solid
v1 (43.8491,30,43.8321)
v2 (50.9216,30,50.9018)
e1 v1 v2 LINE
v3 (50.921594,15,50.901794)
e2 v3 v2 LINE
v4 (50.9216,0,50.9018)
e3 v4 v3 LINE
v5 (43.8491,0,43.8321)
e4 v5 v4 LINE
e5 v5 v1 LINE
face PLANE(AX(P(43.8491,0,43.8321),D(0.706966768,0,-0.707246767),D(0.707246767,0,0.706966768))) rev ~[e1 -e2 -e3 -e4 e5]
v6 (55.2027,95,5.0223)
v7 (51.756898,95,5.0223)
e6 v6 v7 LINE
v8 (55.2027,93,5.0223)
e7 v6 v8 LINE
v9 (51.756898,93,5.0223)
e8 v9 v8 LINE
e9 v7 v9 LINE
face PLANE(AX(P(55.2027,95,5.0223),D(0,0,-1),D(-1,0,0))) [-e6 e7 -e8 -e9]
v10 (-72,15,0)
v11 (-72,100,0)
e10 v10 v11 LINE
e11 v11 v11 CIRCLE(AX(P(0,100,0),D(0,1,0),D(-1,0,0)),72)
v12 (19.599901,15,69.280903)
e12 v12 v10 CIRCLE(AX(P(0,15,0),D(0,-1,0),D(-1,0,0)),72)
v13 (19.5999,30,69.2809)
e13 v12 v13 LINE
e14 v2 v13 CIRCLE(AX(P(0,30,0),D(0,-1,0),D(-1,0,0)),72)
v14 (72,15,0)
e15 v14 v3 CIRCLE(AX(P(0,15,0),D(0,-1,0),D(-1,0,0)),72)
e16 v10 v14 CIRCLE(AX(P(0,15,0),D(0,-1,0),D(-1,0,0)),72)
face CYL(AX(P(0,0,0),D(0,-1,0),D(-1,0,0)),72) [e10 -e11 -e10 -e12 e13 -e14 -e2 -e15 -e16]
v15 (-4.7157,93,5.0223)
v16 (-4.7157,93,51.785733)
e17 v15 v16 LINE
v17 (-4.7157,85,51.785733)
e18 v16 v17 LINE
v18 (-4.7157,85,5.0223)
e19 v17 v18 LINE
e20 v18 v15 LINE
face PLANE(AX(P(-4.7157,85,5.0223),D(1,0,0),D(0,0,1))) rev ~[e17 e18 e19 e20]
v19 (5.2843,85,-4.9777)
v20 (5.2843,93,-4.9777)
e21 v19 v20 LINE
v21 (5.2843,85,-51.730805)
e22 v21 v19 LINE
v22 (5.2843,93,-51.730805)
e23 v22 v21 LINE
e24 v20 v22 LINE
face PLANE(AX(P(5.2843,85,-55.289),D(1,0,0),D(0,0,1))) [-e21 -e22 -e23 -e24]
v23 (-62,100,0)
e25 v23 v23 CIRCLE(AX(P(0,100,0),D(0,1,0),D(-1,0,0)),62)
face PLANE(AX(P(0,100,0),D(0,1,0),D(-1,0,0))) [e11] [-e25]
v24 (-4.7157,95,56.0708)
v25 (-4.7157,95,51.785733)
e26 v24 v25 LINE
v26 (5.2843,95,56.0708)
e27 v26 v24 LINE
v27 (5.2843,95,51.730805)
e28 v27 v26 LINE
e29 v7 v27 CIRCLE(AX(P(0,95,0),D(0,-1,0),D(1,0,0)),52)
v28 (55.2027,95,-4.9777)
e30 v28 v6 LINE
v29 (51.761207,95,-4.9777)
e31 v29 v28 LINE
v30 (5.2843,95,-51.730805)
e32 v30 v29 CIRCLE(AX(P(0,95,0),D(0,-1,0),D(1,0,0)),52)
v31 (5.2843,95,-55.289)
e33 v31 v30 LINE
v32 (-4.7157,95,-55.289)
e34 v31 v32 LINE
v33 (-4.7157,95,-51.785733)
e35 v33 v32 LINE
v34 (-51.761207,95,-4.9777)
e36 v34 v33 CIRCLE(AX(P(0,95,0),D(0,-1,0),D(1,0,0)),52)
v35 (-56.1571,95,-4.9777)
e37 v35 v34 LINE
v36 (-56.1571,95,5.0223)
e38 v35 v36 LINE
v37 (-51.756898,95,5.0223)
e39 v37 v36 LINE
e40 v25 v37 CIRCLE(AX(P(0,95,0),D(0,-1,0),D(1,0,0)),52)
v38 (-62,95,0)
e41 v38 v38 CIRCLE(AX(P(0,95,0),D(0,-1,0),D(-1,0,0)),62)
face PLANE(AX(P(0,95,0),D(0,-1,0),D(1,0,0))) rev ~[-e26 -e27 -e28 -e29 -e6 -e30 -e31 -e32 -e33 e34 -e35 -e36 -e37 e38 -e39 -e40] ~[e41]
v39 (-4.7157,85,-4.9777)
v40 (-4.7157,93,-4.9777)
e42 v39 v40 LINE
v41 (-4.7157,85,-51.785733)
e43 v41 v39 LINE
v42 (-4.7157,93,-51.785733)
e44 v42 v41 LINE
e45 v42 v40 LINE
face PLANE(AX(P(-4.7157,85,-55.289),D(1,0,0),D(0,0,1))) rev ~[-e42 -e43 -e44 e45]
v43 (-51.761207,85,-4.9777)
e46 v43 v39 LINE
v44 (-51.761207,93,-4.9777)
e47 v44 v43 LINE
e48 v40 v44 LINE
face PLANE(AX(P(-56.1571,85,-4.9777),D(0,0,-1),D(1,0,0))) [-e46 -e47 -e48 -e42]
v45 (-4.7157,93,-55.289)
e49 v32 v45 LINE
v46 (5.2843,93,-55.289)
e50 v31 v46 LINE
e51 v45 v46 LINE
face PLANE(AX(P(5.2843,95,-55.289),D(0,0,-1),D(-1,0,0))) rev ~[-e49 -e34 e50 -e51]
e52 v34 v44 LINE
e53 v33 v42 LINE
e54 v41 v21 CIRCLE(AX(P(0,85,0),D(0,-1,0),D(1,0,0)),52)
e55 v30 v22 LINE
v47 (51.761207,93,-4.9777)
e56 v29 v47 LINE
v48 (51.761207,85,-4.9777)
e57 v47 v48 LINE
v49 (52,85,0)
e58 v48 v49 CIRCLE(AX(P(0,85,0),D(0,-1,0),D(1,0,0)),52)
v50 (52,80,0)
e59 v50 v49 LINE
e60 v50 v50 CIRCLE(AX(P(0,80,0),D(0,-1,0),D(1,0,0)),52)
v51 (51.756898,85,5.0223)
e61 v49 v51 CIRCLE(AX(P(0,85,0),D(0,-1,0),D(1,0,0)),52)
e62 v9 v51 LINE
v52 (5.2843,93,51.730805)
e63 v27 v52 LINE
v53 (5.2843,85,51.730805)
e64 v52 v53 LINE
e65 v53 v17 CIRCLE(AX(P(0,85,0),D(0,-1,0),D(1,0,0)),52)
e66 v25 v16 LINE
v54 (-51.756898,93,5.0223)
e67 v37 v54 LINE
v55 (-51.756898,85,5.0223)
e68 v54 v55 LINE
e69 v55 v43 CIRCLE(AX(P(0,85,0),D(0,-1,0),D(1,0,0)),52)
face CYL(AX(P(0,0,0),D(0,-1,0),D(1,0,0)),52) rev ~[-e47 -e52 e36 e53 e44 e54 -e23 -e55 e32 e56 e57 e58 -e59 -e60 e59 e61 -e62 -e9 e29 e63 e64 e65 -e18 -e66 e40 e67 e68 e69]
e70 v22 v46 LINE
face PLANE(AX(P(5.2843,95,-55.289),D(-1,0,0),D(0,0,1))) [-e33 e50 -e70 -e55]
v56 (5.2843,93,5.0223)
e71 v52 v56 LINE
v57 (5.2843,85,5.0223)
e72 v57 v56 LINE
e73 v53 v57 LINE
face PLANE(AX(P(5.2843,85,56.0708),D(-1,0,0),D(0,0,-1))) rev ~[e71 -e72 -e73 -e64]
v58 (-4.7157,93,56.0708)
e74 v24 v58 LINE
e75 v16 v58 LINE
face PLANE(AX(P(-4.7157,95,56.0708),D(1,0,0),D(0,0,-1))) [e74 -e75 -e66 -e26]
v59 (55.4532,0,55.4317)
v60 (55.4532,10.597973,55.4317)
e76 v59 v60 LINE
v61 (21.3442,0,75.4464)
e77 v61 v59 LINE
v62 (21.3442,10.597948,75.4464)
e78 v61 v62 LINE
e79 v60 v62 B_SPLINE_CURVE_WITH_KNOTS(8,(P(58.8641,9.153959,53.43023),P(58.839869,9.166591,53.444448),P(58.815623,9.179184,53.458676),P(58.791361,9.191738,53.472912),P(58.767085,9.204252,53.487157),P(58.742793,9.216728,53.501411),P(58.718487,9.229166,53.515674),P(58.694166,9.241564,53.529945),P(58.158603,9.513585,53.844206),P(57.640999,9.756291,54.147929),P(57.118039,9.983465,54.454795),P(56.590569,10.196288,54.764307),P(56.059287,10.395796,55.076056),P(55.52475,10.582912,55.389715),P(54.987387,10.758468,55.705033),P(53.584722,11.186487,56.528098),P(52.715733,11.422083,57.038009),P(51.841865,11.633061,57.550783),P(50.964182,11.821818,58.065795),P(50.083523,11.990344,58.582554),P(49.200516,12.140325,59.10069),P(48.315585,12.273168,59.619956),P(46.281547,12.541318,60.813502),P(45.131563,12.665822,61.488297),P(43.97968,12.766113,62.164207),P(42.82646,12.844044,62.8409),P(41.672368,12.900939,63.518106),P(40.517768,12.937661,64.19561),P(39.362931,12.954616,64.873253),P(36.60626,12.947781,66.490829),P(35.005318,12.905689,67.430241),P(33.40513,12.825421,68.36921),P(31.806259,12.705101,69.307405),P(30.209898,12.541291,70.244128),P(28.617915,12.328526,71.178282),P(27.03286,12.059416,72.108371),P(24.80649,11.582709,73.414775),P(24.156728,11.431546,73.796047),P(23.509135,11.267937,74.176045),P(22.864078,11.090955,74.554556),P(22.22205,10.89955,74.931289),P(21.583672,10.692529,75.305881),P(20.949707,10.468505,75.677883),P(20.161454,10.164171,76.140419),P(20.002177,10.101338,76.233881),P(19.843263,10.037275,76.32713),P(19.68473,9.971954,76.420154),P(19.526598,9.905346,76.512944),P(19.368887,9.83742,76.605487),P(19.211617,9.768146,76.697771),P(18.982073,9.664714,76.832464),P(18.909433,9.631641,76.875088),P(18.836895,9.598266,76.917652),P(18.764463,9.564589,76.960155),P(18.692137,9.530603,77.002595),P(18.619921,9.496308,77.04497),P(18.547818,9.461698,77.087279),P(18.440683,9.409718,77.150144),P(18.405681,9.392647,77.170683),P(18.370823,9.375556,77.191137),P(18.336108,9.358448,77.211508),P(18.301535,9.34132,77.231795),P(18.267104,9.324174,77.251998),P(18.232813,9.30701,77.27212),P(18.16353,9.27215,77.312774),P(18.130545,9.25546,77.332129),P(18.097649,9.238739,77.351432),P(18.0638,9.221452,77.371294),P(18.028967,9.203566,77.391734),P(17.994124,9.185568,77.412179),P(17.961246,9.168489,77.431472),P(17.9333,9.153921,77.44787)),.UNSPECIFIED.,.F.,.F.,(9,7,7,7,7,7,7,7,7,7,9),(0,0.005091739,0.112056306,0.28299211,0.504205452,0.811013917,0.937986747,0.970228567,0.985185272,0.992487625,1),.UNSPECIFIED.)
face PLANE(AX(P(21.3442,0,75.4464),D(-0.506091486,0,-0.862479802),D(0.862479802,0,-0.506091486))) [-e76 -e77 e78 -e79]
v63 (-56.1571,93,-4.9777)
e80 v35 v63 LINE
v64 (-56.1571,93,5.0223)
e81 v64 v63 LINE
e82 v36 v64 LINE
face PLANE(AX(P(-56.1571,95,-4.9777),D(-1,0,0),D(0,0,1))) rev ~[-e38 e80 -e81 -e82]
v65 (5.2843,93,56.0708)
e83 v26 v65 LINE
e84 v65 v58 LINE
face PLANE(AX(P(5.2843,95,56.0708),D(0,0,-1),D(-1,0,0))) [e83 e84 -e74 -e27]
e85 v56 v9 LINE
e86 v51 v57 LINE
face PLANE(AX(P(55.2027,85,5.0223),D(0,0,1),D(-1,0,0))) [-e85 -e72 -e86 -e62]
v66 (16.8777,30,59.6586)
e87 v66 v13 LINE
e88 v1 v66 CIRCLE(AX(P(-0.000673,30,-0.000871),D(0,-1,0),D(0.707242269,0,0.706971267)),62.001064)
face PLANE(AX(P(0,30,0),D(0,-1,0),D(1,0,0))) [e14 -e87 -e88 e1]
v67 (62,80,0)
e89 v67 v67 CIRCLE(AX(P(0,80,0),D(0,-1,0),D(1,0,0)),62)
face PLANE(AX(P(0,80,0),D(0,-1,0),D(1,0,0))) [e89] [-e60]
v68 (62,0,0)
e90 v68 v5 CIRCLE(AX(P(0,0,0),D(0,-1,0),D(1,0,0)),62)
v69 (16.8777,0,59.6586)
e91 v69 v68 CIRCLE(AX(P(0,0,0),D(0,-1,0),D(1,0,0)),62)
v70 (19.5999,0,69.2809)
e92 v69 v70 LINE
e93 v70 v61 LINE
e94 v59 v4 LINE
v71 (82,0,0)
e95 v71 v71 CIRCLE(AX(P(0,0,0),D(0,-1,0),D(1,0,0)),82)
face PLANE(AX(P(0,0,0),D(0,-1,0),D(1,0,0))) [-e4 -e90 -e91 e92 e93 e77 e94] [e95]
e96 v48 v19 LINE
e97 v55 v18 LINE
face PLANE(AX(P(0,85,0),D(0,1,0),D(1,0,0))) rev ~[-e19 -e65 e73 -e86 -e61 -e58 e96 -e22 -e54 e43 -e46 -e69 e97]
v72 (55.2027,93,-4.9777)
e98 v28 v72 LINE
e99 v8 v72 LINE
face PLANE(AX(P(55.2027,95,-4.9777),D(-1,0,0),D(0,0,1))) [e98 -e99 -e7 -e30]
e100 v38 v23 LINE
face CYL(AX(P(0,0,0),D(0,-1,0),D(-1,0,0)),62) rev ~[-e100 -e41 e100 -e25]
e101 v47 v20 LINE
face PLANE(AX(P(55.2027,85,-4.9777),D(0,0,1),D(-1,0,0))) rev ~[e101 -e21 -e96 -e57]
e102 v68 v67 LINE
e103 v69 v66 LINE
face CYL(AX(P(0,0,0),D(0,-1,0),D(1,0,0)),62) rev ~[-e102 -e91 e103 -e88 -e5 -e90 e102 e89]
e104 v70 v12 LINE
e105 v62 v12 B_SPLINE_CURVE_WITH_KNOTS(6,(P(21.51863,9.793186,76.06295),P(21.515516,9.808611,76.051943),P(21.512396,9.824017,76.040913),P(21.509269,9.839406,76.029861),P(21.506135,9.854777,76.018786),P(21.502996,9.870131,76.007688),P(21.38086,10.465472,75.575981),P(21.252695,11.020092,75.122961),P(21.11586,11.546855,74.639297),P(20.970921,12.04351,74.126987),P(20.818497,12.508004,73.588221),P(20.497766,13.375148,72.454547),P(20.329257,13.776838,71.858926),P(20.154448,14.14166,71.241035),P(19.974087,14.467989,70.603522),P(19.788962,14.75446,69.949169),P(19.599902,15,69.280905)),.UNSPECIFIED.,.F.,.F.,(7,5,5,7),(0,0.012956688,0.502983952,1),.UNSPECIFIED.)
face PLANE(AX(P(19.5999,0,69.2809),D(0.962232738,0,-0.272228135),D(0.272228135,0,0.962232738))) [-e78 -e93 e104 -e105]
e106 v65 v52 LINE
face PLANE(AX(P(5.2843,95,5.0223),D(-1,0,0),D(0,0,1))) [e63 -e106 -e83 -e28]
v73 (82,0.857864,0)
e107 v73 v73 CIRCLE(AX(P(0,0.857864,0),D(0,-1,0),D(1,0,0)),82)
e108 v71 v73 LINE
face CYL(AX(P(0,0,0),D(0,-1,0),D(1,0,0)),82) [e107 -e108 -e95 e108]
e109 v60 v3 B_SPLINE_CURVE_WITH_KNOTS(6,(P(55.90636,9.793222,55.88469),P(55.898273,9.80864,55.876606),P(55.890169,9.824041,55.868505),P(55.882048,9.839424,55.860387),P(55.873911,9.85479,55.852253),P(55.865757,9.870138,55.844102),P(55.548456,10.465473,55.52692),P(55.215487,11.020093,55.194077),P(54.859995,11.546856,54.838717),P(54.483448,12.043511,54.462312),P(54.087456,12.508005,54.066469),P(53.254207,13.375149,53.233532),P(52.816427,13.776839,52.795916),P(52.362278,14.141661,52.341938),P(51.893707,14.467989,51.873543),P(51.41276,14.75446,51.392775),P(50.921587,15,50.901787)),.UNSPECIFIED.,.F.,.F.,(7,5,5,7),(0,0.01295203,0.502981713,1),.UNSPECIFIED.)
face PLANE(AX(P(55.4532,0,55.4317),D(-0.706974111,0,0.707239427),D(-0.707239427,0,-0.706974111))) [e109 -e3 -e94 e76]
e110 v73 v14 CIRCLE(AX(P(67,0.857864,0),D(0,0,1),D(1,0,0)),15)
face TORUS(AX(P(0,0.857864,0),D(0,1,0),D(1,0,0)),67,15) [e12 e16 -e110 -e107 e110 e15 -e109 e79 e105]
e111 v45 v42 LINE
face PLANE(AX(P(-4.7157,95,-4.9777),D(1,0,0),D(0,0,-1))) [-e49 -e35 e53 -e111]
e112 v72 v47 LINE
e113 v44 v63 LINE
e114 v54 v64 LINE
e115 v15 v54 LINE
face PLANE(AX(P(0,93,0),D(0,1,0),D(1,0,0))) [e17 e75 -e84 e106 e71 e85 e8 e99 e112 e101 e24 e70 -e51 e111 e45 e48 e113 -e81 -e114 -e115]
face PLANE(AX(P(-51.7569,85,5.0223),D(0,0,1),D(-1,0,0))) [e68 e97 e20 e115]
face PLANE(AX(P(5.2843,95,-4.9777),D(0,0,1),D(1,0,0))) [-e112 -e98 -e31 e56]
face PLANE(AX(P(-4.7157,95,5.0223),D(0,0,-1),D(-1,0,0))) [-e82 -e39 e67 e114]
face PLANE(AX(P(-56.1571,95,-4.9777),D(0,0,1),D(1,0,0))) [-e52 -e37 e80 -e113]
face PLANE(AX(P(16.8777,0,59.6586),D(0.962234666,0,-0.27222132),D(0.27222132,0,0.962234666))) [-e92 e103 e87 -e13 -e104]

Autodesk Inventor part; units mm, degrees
ref_plane "YZ Plane" through (0, 0, 0) normal (1, 0, 0) x (0, 1, 0)
ref_plane "XZ Plane" through (0, 0, 0) normal (0, 1, 0) x (-1, 0, 0)
ref_plane "XY Plane" through (0, 0, 0) normal (0, 0, 1) x (1, 0, 0)
sketch "Boceto1" plane through (0, 0, 0) normal (0, 1, 0) x (-1, 0, 0)
  circle A0 centre (0, 0) radius 62
  circle A1 centre (0, 0) radius 72
  circle A2 centre (0, 0) radius 52
  dimension "d5" = 124
  dimension "d6" = 144
  dimension "d7" = 104
extrude "Extrusión1" add sketch "Boceto1" along normal blind 100 contours A1
sketch "Boceto5" plane through (0, 0, 0) normal (0, -1, 0) x (1, 0, 0)
  circle A0 centre (0, 0) radius 52
  circle A1 centre (0, 0) radius 62
  dimension "d11" = 104
  dimension "d12" = 124
extrude "Extrusión2" add sketch "Boceto5" against normal blind 95
sketch "Boceto6" plane through (0, 0, 0) normal (0, -1, 0) x (1, 0, 0)
  circle A0 centre (0, 0) radius 52
  circle A1 centre (0, 0) radius 62
  dimension "d15" = 104
  dimension "d16" = 124
extrude "Extrusión3" cut sketch "Boceto6" against normal blind 80
sketch "Boceto7" plane through (0, 0, 0) normal (0, -1, 0) x (1, 0, 0)
  circle A0 centre (0, 0) radius 82
  circle A1 centre (0, 0) radius 72
  dimension "d19" = 164
  dimension "d20" = 144
extrude "Extrusión4" add sketch "Boceto7" against normal blind 15
fillet "Empalme1" radius 15 1 edges at (-82, 15, 0)
sketch "Boceto8" plane through (0, 0, 0) normal (0, -1, 0) x (1, 0, 0)
  arc A0 (43.8491, 43.8321) -> (16.8777, 59.6586) centre (0, 0) ccw
  line L0 (43.8491, 43.8321) -> (50.9216, 50.9018)
  line L1 (16.8777, 59.6586) -> (19.5999, 69.2809)
  line L2 (19.5999, 69.2809) -> (21.3442, 75.4464)
  line L3 (21.3442, 75.4464) -> (55.4532, 55.4317)
  line L4 (55.4532, 55.4317) -> (50.9216, 50.9018)
  dimension "d25" = 124
extrude "Extrusión5" cut sketch "Boceto8" against normal blind 30
sketch "Boceto9" plane through (0, 95, 0) normal (0, 1, 0) x (1, 0, 0)
  line L0 (51.775, -4.7614) -> (51.775, 6.1116)
  line L1 (5.2843, 55.289) -> (-4.7157, 55.289)
  line L2 (5.2843, 55.289) -> (5.2843, -56.0708)
  line L3 (5.2843, -56.0708) -> (-4.7157, -56.0708)
  line L4 (-4.7157, -56.0708) -> (-4.7157, 55.289)
  line L5 (5.2843, 55.289) -> (-4.7157, 55.289)
  line L6 (5.2843, 55.289) -> (5.2843, -56.0708)
  line L7 (5.2843, -56.0708) -> (-4.7157, -56.0708)
  line L8 (-4.7157, -56.0708) -> (-4.7157, 55.289)
  line L9 (-56.1571, 4.9777) -> (-56.1571, -5.0223)
  line L10 (-56.1571, 4.9777) -> (55.2027, 4.9777)
  line L11 (55.2027, 4.9777) -> (55.2027, -5.0223)
  line L12 (55.2027, -5.0223) -> (-56.1571, -5.0223)
extrude "Extrusión6" cut sketch "Boceto9" against normal blind 10
sketch "Boceto10" plane through (0, 85, 0) normal (0, 1, 0) x (1, 0, 0)
  line L0 (-51.7569, -5.0223) -> (-56.1571, -5.0223) projected
  line L1 (55.2027, -5.0223) -> (51.7569, -5.0223) projected
  line L2 (-56.1571, -5.0223) -> (55.2027, -5.0223)
  line L3 (55.2027, -5.0223) -> (55.2027, 4.9777)
  line L4 (-56.1571, 4.9777) -> (-51.7612, 4.9777) projected
  line L5 (55.2027, 4.9777) -> (-56.1571, 4.9777)
  line L6 (-56.1571, -5.0223) -> (-56.1571, 4.9777) projected
  line L7 (-56.1571, 4.9777) -> (-56.1571, -5.0223)
  line L8 (-4.7157, -56.0708) -> (-4.7157, -51.7857) projected
  line L9 (5.2843, -56.0708) -> (-4.7157, -56.0708) projected
  line L10 (-4.7157, -56.0708) -> (5.2843, -56.0708)
  line L11 (5.2843, 55.289) -> (5.2843, 51.7308) projected
  line L12 (5.2843, -56.0708) -> (5.2843, 55.289)
  line L13 (-4.7157, 55.289) -> (5.2843, 55.289) projected
  line L14 (5.2843, 55.289) -> (-4.7157, 55.289)
  line L15 (-4.7157, 55.289) -> (-4.7157, -56.0708)
  point P0 (0, 0)
extrude "Extrusión7" add sketch "Boceto10" along normal blind 8
sketch "Boceto11" plane through (0, 85, 0) normal (0, -1, 0) x (1, 0, 0)
  line L0 (0, 0) -> (0, -9.6645)
properties part number "BaseRod_Pepu"
